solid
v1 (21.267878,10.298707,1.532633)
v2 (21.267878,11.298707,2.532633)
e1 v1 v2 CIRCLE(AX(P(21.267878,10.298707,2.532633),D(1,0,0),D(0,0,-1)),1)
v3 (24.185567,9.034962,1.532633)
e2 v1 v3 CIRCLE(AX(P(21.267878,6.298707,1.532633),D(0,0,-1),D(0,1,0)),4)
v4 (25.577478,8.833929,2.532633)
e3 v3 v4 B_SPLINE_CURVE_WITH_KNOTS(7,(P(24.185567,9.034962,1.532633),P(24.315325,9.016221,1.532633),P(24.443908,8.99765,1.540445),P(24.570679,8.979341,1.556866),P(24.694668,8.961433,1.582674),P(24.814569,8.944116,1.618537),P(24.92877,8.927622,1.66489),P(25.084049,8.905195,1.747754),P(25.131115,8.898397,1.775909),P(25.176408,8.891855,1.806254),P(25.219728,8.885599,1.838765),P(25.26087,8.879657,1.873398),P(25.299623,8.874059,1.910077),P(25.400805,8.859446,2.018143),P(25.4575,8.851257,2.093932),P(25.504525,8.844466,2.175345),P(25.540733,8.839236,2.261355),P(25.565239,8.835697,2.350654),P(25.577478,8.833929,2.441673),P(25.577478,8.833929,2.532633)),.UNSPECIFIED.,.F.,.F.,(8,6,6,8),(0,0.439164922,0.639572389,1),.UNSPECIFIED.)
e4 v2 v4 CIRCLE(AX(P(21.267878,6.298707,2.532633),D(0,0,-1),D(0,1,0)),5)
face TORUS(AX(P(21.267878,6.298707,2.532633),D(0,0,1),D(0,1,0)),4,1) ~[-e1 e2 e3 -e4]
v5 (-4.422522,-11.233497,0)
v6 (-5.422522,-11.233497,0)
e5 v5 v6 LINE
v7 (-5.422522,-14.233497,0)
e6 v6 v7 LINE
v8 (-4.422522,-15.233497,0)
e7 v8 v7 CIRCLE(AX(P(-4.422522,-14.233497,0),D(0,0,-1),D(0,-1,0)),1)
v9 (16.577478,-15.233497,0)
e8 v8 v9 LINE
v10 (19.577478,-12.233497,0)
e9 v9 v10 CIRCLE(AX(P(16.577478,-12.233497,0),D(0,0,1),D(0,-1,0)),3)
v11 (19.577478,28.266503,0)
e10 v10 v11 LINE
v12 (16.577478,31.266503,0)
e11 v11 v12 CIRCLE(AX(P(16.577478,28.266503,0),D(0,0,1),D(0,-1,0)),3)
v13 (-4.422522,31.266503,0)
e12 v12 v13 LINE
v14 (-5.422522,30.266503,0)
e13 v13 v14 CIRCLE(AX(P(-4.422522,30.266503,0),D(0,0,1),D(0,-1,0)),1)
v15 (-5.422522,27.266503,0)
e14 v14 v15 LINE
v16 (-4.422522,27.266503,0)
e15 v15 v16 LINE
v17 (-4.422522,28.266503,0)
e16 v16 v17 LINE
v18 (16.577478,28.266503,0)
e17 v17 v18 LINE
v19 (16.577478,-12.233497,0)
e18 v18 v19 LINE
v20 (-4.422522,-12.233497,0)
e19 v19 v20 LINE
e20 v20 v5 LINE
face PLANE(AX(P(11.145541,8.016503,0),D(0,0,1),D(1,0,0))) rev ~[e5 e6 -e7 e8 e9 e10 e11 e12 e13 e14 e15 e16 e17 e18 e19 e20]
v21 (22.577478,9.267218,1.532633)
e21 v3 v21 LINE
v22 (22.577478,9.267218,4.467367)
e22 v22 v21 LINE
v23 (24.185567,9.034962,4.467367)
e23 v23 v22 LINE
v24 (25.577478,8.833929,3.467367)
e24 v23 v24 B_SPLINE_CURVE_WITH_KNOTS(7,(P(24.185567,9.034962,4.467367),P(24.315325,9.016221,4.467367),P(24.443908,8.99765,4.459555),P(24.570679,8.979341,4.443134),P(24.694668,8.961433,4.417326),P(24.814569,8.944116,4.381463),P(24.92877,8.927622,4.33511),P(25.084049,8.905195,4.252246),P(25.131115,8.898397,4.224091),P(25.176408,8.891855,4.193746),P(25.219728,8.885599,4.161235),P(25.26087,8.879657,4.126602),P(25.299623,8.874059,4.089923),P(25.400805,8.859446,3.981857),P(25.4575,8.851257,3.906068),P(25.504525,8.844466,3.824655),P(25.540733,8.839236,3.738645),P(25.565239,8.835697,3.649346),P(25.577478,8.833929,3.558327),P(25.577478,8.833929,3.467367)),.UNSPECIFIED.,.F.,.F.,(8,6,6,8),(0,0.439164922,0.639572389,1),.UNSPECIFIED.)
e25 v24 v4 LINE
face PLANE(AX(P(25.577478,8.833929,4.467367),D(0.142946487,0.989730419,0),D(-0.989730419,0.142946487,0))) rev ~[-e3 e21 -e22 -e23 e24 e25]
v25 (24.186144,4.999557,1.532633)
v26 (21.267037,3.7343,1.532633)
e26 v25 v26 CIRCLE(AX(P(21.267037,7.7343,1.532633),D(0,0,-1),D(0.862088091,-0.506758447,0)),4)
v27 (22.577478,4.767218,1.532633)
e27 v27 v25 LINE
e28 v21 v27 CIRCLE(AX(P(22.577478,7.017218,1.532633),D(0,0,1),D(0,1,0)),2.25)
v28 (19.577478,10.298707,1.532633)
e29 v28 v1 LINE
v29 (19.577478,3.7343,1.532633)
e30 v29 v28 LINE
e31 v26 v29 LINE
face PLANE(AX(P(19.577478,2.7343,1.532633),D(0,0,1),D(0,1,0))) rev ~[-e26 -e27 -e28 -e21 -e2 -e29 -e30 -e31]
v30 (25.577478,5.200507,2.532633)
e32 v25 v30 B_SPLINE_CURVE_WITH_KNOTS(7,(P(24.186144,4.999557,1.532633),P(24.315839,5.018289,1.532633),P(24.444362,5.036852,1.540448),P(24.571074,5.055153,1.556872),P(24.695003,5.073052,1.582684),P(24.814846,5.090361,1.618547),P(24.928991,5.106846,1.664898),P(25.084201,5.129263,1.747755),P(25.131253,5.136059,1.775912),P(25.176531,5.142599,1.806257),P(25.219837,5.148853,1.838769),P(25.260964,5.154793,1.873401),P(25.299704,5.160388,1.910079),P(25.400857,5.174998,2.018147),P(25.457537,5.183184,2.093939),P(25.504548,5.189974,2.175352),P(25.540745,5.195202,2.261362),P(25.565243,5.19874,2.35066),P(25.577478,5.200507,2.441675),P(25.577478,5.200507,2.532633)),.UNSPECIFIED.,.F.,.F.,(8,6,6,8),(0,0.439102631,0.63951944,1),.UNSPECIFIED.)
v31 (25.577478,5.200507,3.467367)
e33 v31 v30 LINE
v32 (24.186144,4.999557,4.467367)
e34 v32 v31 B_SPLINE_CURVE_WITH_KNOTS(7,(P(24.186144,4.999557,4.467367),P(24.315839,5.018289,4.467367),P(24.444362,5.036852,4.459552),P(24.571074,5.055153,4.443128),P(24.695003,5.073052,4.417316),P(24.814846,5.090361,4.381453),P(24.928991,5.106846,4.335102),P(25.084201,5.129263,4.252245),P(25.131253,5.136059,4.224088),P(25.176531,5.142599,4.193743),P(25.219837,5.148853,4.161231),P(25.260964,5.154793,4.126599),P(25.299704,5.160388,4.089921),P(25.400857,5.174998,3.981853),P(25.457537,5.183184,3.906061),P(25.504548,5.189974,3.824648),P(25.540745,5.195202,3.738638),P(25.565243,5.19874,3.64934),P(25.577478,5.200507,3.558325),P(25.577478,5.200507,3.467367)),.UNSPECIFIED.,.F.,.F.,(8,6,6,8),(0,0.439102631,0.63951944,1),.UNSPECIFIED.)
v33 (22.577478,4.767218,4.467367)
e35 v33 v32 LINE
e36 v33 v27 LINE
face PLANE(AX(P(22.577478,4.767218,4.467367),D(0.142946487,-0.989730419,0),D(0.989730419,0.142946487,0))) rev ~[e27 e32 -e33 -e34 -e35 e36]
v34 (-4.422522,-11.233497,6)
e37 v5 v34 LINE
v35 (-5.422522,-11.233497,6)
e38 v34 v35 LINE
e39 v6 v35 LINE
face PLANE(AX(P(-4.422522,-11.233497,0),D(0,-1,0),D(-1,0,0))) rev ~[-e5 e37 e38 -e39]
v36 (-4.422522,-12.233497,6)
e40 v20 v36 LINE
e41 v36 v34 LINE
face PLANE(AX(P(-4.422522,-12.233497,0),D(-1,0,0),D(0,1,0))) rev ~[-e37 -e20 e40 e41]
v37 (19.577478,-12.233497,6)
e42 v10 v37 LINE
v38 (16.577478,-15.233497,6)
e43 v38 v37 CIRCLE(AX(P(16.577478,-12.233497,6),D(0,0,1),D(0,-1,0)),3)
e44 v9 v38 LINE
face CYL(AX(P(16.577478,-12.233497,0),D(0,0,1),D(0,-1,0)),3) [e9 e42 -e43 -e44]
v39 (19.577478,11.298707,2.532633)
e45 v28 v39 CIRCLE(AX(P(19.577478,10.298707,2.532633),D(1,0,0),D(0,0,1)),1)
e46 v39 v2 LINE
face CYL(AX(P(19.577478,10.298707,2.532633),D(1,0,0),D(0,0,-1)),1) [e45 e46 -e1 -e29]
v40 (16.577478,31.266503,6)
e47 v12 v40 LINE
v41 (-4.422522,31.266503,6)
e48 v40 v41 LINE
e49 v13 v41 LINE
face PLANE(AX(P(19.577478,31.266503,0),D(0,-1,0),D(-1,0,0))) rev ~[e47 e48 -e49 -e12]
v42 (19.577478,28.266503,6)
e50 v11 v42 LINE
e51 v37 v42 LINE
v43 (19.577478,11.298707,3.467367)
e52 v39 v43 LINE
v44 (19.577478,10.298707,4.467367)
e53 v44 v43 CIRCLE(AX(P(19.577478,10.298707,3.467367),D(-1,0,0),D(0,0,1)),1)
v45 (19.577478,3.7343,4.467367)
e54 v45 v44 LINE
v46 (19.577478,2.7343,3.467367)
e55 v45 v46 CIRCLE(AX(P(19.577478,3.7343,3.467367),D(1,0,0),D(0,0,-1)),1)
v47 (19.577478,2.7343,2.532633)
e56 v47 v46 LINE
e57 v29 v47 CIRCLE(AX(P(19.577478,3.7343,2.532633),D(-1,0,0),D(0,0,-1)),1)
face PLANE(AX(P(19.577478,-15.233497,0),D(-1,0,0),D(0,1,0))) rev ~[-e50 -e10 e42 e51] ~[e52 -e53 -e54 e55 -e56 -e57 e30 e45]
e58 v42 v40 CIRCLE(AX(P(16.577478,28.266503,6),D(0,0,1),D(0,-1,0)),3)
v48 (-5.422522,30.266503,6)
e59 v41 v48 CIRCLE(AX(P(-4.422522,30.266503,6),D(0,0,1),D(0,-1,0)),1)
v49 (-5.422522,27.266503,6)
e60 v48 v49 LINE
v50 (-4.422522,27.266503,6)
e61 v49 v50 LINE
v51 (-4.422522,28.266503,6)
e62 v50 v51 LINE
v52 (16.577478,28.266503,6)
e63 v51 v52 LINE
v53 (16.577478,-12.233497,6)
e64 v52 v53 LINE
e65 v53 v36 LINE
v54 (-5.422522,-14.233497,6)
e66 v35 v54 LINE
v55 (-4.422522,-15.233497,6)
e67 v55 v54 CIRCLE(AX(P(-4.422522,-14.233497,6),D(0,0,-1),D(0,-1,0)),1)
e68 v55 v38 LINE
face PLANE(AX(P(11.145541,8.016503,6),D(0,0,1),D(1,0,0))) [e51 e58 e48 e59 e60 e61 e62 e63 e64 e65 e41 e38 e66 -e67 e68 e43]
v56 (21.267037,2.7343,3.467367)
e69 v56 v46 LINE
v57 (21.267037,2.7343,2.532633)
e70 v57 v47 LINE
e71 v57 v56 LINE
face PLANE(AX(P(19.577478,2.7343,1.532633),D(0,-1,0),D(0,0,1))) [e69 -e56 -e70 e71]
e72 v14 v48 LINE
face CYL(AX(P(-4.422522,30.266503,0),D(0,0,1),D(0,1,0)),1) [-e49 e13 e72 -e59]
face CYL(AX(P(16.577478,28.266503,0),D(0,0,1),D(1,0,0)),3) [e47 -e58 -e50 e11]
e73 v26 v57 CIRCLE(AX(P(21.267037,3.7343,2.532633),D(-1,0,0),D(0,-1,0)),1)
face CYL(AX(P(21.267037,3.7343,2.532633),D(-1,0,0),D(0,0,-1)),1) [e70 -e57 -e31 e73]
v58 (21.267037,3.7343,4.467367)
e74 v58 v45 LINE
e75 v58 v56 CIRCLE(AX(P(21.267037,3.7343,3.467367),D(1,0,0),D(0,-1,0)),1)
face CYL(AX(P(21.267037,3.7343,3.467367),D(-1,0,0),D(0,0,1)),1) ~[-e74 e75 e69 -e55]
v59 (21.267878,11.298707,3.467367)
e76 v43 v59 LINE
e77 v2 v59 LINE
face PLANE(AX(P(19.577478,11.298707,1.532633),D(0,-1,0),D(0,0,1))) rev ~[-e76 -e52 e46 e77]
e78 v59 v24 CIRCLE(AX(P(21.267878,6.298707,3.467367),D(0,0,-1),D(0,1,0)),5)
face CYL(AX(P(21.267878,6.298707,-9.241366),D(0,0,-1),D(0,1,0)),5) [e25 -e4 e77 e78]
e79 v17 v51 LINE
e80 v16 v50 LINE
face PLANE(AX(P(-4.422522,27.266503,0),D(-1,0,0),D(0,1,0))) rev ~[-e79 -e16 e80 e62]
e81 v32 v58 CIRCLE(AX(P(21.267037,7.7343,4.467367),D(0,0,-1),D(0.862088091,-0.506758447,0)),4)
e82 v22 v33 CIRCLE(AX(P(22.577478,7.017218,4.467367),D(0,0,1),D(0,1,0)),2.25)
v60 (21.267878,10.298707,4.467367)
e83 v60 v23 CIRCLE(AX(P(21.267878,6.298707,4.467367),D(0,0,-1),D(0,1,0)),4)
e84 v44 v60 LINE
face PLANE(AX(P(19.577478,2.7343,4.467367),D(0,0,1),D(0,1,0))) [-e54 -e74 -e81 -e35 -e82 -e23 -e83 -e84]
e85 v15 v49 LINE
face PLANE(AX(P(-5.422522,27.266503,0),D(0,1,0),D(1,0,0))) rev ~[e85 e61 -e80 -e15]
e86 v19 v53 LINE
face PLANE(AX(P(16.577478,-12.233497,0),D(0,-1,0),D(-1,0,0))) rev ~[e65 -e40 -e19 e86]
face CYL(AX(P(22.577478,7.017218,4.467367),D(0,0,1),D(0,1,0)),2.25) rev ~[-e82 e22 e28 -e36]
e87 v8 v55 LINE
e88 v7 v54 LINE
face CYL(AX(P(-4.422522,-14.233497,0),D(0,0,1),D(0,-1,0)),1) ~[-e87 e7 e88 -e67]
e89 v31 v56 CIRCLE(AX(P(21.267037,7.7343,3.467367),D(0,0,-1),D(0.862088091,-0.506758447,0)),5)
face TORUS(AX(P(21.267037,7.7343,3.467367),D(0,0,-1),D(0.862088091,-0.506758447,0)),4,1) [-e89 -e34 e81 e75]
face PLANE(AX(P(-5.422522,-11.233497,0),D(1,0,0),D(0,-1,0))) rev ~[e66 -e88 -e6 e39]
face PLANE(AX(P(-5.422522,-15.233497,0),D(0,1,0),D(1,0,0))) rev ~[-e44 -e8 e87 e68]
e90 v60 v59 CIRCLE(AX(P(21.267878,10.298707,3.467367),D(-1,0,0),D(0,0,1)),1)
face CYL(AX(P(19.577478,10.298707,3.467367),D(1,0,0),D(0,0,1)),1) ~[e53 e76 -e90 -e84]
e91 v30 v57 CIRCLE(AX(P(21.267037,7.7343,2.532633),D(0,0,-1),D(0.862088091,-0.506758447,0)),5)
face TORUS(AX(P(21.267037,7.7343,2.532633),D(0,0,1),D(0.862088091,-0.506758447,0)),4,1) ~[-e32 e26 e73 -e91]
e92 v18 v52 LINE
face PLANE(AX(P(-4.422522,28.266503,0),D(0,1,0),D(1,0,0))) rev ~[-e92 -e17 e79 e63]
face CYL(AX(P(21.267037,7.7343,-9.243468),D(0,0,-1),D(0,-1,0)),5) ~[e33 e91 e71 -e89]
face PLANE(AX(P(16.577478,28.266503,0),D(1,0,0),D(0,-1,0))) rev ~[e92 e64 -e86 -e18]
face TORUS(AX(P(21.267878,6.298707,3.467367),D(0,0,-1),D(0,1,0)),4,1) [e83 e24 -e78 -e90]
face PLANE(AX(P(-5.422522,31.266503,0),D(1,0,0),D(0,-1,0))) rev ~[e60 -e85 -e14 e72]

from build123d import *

# Parameters (mm, degrees)
F1_DEPTH    = 6
F2_W        = 8.5644074716
F2_H        = 2.9347334579
F3_DEPTH    = 6
F5_DEPTH    = 25
F6_T1_DEPTH = 24.4869357348
F6_T3_DEPTH = 24.4827319302
F7_R        = 3
F8_R        = 1


# Not quite as in the source:
# - a fillet or chamfer that OpenCascade refuses, or shapes differently, is made with other operations: its cross-section is extruded or revolved along the edge and cut away or added


with BuildPart() as f1:
    # F0 (on Top) → F1 (new body)
    with BuildSketch(Plane.XY):
        Polygon((-4.42252215, 28.2665032521), (16.57747785, 28.2665032521), (16.57747785, -12.2334967479), (-4.42252215, -12.2334967479), (-4.42252215, -11.2334967479), (-5.42252215, -11.2334967479), (-5.42252215, -13.2334967479), (-5.42252215, -15.2334967479), (-4.42252215, -15.2334967479), (16.57747785, -15.2334967479), (19.57747785, -15.2334967479), (19.57747785, -13.2334967479), (19.57747785, 27.2665032521), (19.57747785, 31.2665032521), (16.57747785, 31.2665032521), (-4.42252215, 31.2665032521), (-5.42252215, 31.2665032521), (-5.42252215, 27.2665032521), (-4.42252215, 27.2665032521), align=None)
    extrude(amount=F1_DEPTH)

    # F2 (on face) → F3 (join)
    with BuildSketch(Plane.YZ.offset(19.57747785)):
        with Locations((7.0165032521, 3)):
            Rectangle(F2_W, F2_H)
    extrude(amount=F3_DEPTH)

    # F4 (on face) → F5 (cut)
    with BuildSketch(Plane.XY.offset(4.4673667289)):
        with BuildLine():
            Line((25.57747785, 8.833928965), (22.57747785, 9.2672181241))
            ThreePointArc((22.57747785, 9.2672181241), (20.32747785, 7.0172181241), (22.57747785, 4.7672181241))
            Line((22.57747785, 4.7672181241), (25.57747785, 5.2005072832))
            Line((25.57747785, 5.2005072832), (25.57747785, 8.833928965))
        make_face()
    extrude(amount=-F5_DEPTH, mode=Mode.SUBTRACT)

    # F6: fillet of radius 5 on 2 edges, made by hand

    # F6_s2 → F6_t1 (cut)
    with BuildSketch(Plane.XY.offset(-9.2434678674)):
        with BuildLine():
            ThreePointArc((21.2670373946, 2.7342995163), (23.7500837932, 3.3944284833), (25.57747785, 5.2005072832))
            Line((25.57747785, 5.2005072832), (25.57747785, 2.7342995163))
            Line((25.57747785, 2.7342995163), (21.2670373946, 2.7342995163))
        make_face()
    extrude(amount=F6_T1_DEPTH, mode=Mode.SUBTRACT)

    # F6_s4 → F6_t3 (cut)
    with BuildSketch(Plane.XY.offset(-9.2413659651)):
        with BuildLine():
            ThreePointArc((21.2678781556, 11.2987069879), (23.7502046967, 10.6389898062), (25.57747785, 8.833928965))
            Line((25.57747785, 8.833928965), (25.57747785, 11.2987069879))
            Line((25.57747785, 11.2987069879), (21.2678781556, 11.2987069879))
        make_face()
    extrude(amount=F6_T3_DEPTH, mode=Mode.SUBTRACT)

    # F7
    f7_edges = [f1.edges().sort_by_distance(p)[0] for p in [
        (19.577478, -15.233497, 3),
        (19.577478, 31.266503, 3),
    ]]
    fillet(f7_edges, radius=F7_R)

    # F8
    f8_edges = [f1.edges().sort_by_distance(p)[0] for p in [
        (-5.422522, -15.233497, 3),
        (-5.422522, 31.266503, 3),
        (23.750084, 3.394428, 4.467367),
        (23.750084, 3.394428, 1.532633),
        (23.750205, 10.63899, 1.532633),
        (23.750205, 10.63899, 4.467367),
        (20.422678, 11.298707, 1.532633),
        (20.422258, 2.7343, 1.532633),
        (20.422258, 2.7343, 4.467367),
        (20.422678, 11.298707, 4.467367),
    ]]
    fillet(f8_edges, radius=F8_R)


solid = f1.part
